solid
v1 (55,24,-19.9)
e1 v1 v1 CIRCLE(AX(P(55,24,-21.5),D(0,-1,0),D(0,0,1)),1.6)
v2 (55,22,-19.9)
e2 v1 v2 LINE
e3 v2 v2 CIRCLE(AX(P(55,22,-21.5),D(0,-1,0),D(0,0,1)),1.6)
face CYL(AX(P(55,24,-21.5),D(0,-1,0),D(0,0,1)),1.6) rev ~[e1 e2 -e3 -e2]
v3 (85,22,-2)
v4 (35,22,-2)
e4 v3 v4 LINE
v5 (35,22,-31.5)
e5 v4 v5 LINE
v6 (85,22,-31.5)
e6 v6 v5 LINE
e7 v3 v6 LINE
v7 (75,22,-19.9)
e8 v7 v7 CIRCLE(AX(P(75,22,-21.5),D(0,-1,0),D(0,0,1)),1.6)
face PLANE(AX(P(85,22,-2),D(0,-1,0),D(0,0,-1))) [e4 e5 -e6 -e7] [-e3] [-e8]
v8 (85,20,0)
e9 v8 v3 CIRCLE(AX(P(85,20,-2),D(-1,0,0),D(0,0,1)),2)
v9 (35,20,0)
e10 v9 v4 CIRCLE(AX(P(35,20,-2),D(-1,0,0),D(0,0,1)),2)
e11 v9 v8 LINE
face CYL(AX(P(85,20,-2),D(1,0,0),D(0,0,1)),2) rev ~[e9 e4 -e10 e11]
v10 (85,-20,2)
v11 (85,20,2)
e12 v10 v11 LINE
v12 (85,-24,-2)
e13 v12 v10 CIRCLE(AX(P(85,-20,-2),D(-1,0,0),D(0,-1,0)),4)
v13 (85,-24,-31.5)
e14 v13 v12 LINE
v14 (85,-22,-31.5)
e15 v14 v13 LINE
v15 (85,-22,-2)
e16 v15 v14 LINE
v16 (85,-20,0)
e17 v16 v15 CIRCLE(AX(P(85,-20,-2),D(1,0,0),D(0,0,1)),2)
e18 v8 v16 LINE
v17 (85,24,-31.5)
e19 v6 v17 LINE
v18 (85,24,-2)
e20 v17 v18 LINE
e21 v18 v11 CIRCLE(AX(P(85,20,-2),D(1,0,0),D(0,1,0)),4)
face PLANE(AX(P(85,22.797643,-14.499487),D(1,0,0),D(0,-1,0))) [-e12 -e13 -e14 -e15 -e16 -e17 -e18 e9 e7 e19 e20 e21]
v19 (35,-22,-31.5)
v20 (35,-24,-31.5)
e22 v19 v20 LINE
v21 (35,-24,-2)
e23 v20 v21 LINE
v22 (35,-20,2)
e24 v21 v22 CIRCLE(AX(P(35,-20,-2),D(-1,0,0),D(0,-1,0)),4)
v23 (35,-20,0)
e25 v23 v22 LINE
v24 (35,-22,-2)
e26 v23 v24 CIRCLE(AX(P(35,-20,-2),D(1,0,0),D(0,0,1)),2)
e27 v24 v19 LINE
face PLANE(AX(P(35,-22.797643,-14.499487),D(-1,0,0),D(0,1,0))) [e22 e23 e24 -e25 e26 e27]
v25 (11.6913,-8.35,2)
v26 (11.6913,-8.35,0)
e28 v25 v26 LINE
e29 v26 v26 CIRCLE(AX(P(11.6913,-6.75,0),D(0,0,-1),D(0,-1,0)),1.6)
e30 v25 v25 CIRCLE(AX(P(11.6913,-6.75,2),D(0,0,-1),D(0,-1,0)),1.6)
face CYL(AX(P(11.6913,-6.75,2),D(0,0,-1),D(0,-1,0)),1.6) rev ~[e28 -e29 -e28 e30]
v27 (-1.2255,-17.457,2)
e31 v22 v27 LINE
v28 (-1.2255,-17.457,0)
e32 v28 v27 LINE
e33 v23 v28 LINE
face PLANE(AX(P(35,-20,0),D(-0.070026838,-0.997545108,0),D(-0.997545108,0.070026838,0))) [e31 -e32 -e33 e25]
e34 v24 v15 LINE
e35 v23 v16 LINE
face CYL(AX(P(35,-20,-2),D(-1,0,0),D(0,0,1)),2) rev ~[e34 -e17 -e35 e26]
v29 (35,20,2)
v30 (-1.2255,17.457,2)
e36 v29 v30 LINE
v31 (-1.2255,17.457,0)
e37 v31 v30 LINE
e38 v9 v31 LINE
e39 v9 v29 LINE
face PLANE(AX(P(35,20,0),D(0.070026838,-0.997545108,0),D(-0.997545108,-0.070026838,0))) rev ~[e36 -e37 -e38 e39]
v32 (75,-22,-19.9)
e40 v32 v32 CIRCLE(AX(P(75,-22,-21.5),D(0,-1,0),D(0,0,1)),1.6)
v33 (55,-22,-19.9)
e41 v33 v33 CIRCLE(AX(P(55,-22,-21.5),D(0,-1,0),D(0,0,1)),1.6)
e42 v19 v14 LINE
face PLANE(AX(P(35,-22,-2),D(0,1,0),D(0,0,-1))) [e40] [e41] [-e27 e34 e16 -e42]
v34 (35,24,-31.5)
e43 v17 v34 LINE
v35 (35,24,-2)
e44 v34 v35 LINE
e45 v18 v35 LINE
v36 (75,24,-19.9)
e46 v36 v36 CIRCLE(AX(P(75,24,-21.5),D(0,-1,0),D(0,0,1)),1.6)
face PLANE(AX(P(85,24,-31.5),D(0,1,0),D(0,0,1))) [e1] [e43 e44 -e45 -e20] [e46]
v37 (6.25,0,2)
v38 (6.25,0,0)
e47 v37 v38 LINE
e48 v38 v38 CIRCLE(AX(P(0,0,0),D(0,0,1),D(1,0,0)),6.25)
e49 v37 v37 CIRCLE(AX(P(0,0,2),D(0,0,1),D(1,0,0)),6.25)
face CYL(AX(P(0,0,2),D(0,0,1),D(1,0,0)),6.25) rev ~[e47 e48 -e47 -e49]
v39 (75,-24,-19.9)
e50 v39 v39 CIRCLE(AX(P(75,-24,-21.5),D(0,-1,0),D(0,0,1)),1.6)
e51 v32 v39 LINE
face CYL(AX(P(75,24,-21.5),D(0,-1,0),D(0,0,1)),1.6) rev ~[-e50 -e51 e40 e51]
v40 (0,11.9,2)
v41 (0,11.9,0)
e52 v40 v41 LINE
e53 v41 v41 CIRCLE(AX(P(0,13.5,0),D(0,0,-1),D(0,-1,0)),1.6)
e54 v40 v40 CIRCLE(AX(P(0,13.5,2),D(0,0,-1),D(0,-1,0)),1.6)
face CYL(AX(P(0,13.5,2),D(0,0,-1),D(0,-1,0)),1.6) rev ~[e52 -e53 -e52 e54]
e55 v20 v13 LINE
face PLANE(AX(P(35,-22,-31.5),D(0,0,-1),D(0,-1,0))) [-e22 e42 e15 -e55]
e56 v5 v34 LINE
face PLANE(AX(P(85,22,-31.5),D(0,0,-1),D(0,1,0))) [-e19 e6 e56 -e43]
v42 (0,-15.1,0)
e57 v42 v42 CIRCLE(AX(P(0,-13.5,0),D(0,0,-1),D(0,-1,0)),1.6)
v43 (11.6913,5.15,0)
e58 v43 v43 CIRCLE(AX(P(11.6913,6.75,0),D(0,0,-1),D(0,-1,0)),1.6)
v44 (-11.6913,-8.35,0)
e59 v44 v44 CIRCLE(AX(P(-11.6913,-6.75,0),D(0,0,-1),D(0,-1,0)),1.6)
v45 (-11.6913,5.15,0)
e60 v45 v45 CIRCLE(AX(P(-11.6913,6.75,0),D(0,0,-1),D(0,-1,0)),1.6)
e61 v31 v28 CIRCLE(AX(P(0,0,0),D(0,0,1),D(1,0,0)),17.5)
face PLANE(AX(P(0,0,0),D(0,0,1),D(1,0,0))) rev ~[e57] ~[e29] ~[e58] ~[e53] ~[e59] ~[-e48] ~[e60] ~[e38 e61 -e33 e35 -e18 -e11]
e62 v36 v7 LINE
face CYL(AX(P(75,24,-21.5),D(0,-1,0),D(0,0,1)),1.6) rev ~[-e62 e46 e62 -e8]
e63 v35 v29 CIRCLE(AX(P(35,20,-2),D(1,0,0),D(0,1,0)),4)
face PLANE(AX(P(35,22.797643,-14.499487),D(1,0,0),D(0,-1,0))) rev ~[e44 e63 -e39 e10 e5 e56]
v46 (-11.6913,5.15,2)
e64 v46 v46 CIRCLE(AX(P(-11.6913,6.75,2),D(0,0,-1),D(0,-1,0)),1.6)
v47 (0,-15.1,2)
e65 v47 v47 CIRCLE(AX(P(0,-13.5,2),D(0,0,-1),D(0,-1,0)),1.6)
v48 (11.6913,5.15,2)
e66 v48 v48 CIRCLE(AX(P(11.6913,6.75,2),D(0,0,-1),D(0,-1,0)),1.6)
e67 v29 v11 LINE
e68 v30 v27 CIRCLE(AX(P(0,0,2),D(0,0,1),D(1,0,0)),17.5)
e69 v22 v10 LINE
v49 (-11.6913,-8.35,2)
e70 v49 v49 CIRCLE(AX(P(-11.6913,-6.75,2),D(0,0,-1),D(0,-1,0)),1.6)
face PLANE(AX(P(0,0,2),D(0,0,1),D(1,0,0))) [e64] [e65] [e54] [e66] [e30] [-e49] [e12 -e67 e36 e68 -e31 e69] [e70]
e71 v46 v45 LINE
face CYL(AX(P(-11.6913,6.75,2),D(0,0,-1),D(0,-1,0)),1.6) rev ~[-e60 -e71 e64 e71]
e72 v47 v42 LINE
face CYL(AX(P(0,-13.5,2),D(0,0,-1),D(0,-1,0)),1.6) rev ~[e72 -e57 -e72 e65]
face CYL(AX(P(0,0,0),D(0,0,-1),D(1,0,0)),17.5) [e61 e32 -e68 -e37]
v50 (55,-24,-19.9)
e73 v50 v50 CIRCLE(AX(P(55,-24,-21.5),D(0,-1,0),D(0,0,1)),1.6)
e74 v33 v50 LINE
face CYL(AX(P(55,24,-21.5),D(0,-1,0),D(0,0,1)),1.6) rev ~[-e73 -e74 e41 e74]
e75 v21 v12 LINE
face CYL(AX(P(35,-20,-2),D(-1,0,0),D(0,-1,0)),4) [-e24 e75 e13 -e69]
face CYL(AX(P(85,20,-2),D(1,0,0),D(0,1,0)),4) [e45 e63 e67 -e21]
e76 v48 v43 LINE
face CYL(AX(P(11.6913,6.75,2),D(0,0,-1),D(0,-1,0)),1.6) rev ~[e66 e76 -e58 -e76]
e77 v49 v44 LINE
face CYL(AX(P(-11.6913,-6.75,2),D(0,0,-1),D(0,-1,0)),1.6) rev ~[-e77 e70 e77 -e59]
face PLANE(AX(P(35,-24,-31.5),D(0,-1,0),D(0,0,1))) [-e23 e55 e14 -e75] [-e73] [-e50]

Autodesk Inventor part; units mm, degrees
ref_plane "YZ Plane" through (0, 0, 0) normal (1, 0, 0) x (0, 1, 0)
ref_plane "XZ Plane" through (0, 0, 0) normal (0, 1, 0) x (-1, 0, 0)
ref_plane "XY Plane" through (0, 0, 0) normal (0, 0, 1) x (1, 0, 0)
sketch "スケッチ1" plane through (0, 0, 0) normal (0, 0, 1) x (1, 0, 0)
  circle A0 centre (0, 0) radius 17.5
  line L0 (0, 0) -> (35, 0)
  line L1 (35, 0) -> (35, 20)
  line L2 (35, 20) -> (-1.2255, 17.457)
  line L3 (35, 20) -> (85, 20)
  line L4 (85, 20) -> (85, 0)
  line L5 (85, 0) -> (35, 0)
  line L6 (35, 0) -> (35, 20)
  line L7 (35, 0) -> (35, -20)
  line L8 (35, -20) -> (-1.2255, -17.457)
  line L9 (35, -20) -> (85, -20)
  line L10 (85, -20) -> (85, 0)
  point P0 (-1.2255, -17.457)
  dimension "d0" = 35
  dimension "d1" = 35
  dimension "d2" = 20
  dimension "d3" = 20
  dimension "d4" = 50
extrude "プレート1" add sketch "スケッチ1" along normal blind 2
sketch "スケッチ2" plane through (85, 22, -2) normal (0, 1, 0) x (-1, 0, 0)
  line L0 (50, 0) -> (0, 0)
  line L1 (0, 0) -> (0, -29.5)
  line L2 (0, -29.5) -> (50, -29.5)
  line L3 (50, -29.5) -> (50, 0)
edge flange "フランジ1" height 33.5 angle 90 thickness 2 bend radius 2 thickness toward (0, 1, 0) relief tear relief width 2 relief depth 1 corner gap 2 corner form 0 edges at (60, 20, 0) (60, -20, 0) wall of the first edge with corners at (35, 22, -2) (85, 22, -2) (85, 22, -31.5) (35, 22, -31.5)
bend "曲げ1"
corner "コーナー1"
sketch "スケッチ3" plane through (0, 0, 2) normal (0, 0, 1) x (1, 0, 0)
  circle A0 centre (0, 0) radius 13.5
  point P0 (0, 13.5)
  point P1 (-11.6913, 6.75)
  point P2 (-11.6913, -6.75)
  point P3 (0, -13.5)
  point P4 (11.6913, -6.75)
  point P5 (11.6913, 6.75)
  dimension "d16" = 27
  dimension "d19" = 360
hole "穴1" at (0, 13.5, 2) at (-11.6913, 6.75, 2) at (-11.6913, -6.75, 2) at (0, -13.5, 2) at (11.6913, -6.75, 2) at (11.6913, 6.75, 2) direction (0, 0, -1) diameter 3.2 end through all
sketch "スケッチ4" plane through (0, 0, 2) normal (0, 0, 1) x (1, 0, 0)
  arc A0 (-1.2255, 17.457) -> (-1.2255, -17.457) centre (0, 0) ccw projected
  circle A1 centre (0, 0) radius 6.25
  dimension "d28" = 12.5
extrude "押し出し1" cut sketch "スケッチ4" against normal blind 10
sketch "スケッチ5" plane through (35, 24, -31.5) normal (0, 1, 0) x (1, 0, 0)
  line L0 (0, 0) -> (0, -29.5) projected
  line L1 (0, -10) -> (50, -10)
  line L2 (50, -29.5) -> (50, 0) projected
  line L3 (50, 0) -> (0, 0) projected
  line L4 (10, 0) -> (10, -29.5)
  line L5 (0, -29.5) -> (50, -29.5) projected
  point P0 (-35, -31.5)
  point P1 (20, -10)
  point P2 (40, -10)
  dimension "d31" = 10
  dimension "d32" = 10
  dimension "d33" = 10
  dimension "d34" = 20
hole "穴2" at (55, 24, -21.5) at (75, 24, -21.5) direction (0, -1, 0) diameter 3.2 end through all
equation "\"d26\" = Thickness"
equation "\"d5\" = Thickness"
equation "\"d6\" = BendReliefWidth"
equation "\"d7\" = BendReliefDepth"
equation "\"d8\" = MinimumRemnant"
equation "\"d9\" = TransitionRadius"
equation "\"d12\" = BendRadius"
equation "\"d13\" = CornerReliefSize"
equation "\"d14\" = GapSize"
equation "\"d15\" = JacobiRadiusSize"
equation "\"BendRadius\" = Thickness"
equation "\"BendReliefWidth\" = Thickness"
equation "\"BendReliefDepth\" = 0.5 * Thickness"
equation "\"CornerReliefSize\" = 4 * Thickness"
equation "\"MinimumRemnant\" = 2 * Thickness"
equation "\"TransitionRadius\" = BendRadius"
equation "\"JacobiRadiusSize\" = BendRadius"
equation "\"GapSize\" = Thickness"
equation "\"Thickness\" = 2"
properties part number "servoplate1_forR0" material "アルミニウム 6061"
